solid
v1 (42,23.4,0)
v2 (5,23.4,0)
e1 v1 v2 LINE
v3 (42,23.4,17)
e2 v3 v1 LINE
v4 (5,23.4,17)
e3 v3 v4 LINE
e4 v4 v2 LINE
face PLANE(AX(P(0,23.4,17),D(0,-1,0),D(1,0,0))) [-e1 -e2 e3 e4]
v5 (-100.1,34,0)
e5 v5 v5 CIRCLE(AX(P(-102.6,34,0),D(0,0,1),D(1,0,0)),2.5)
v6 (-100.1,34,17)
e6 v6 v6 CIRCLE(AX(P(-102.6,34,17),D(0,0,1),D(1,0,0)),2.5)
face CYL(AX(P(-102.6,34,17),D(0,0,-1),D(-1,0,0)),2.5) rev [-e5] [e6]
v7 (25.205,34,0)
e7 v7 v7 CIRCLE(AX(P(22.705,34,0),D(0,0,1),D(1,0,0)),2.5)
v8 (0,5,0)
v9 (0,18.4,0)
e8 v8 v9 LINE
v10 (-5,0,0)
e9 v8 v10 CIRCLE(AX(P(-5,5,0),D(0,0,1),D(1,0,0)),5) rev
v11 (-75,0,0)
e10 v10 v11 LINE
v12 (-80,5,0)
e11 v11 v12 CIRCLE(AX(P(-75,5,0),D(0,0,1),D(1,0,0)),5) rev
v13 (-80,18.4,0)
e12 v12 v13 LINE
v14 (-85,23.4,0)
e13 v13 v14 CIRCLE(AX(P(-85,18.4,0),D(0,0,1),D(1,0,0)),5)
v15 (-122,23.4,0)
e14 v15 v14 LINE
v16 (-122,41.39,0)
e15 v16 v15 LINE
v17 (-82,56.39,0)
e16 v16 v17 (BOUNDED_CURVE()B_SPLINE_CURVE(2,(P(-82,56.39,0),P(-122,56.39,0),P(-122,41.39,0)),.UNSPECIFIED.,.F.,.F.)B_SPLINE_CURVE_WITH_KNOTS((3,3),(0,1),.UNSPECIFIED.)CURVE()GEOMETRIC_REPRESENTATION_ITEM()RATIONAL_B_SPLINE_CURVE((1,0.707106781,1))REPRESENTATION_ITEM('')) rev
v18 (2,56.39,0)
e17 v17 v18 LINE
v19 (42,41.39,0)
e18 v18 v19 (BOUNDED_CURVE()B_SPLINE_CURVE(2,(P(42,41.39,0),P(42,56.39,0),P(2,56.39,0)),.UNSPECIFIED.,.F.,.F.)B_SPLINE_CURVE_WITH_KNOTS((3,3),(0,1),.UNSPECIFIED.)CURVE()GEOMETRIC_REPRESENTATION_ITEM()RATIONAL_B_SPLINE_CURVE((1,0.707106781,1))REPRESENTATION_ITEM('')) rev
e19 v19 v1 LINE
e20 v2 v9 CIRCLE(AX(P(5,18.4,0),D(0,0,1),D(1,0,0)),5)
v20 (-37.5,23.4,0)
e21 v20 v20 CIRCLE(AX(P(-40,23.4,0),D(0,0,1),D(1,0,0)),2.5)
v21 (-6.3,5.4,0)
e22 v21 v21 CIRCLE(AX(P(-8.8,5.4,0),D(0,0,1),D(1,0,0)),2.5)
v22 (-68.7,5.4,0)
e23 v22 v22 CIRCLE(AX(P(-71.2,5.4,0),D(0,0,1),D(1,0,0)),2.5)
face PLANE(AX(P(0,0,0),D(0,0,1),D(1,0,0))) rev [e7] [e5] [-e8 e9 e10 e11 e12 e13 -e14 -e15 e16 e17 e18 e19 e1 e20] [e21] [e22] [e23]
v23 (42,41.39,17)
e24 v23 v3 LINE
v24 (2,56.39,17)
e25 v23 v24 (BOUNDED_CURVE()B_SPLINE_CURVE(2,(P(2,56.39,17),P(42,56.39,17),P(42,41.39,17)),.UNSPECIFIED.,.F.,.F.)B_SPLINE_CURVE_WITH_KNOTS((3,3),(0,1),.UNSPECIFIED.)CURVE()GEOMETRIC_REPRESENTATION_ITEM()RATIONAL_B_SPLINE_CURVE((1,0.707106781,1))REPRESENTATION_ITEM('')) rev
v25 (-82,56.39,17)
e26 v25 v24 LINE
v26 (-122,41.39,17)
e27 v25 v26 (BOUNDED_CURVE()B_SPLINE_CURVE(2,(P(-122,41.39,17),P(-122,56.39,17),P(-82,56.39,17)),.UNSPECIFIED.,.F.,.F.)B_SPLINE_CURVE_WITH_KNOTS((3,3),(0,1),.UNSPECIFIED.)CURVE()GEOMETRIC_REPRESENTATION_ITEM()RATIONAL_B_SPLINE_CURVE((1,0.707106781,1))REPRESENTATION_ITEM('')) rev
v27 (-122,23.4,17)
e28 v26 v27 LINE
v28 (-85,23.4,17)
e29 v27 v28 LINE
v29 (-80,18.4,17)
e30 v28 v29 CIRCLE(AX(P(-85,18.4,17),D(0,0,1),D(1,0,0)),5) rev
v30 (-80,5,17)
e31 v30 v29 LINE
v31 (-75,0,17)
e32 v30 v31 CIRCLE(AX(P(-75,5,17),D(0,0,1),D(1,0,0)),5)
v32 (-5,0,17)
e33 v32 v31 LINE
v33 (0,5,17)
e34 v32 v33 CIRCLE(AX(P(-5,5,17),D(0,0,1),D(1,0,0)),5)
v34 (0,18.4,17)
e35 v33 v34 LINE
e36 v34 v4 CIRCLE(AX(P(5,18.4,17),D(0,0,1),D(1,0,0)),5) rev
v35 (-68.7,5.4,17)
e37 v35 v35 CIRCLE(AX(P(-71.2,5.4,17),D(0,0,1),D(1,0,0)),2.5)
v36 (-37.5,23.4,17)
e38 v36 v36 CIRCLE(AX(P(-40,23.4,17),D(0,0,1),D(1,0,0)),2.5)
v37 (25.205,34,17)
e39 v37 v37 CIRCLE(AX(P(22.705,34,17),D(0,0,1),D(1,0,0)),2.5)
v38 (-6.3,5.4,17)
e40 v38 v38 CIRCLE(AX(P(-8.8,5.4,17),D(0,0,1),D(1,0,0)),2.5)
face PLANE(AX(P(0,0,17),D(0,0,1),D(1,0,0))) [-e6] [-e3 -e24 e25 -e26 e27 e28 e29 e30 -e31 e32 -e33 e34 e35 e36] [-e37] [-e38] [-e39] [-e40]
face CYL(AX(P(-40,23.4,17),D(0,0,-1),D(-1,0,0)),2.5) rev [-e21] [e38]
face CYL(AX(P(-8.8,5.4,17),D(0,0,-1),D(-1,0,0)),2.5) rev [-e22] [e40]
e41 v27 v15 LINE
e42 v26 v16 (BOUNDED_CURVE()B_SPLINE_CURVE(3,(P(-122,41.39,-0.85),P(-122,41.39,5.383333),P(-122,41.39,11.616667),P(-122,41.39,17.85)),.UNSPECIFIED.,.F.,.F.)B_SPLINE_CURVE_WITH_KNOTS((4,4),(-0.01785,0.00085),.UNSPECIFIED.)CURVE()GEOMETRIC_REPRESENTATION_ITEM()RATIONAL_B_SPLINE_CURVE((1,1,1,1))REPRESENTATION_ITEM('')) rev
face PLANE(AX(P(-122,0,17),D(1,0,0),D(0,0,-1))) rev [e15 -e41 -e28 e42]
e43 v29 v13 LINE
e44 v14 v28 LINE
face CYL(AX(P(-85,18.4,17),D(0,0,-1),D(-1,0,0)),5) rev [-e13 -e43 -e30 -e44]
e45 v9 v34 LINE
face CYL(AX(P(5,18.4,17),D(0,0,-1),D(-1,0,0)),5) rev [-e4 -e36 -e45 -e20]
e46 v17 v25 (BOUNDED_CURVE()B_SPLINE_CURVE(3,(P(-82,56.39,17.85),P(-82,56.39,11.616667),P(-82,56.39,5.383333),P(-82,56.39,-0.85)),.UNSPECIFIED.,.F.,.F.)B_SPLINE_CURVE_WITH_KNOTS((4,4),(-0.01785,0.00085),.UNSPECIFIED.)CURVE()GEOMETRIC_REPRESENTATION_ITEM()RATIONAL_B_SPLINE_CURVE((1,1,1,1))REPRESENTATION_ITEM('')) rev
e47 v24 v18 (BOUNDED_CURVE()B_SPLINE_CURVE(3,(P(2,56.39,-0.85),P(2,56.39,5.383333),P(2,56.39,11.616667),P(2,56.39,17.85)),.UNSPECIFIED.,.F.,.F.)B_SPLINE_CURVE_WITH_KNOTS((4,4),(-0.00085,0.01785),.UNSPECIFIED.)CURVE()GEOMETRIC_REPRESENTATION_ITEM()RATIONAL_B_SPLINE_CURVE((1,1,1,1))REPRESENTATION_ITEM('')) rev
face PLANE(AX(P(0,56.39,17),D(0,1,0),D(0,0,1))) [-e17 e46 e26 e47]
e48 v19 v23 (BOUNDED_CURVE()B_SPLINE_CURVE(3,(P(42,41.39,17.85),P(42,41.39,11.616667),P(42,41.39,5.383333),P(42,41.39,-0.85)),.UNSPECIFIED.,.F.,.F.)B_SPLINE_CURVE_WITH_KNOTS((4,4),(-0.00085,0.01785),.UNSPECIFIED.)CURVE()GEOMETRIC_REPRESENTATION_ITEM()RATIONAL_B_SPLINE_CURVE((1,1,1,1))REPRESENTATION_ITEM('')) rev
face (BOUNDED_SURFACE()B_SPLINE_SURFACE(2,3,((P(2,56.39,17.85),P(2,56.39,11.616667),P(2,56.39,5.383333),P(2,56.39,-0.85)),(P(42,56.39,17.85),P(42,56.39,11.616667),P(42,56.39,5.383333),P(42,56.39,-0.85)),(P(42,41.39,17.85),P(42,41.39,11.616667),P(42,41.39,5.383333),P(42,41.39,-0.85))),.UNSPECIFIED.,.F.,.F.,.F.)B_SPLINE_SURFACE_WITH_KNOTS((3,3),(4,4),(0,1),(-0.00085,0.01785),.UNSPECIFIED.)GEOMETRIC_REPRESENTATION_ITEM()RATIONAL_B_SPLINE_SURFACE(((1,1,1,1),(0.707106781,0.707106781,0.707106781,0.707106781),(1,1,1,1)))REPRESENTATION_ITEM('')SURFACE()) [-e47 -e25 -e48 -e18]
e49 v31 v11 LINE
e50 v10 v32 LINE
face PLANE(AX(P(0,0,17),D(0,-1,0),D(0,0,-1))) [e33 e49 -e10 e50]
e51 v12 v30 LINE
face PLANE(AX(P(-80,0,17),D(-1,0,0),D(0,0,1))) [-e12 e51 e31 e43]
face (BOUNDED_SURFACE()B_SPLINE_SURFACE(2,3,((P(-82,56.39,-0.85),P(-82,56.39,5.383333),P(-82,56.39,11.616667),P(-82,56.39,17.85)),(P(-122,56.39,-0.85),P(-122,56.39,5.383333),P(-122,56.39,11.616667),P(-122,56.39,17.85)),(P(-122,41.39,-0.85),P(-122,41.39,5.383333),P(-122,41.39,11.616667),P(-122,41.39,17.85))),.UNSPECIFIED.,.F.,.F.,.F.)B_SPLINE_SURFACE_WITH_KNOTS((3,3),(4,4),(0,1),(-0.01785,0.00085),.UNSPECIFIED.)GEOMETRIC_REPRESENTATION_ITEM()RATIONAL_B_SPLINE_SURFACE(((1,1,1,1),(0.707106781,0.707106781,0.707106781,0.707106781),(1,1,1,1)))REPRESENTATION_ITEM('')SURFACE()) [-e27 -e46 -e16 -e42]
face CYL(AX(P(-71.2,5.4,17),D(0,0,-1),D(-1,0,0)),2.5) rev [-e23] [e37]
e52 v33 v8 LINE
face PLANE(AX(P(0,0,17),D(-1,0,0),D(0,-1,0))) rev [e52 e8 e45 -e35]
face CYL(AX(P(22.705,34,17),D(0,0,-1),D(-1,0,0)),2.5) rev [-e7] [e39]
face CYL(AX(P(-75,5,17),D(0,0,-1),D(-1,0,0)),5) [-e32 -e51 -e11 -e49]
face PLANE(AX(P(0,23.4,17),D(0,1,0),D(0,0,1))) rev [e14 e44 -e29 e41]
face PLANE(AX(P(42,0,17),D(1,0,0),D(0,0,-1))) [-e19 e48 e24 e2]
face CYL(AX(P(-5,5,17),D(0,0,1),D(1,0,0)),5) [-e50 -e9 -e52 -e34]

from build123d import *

# Parameters (mm, degrees)
SKETCH_1_R      = 2.5
EXTRUDE_1_DEPTH = 17
FILLET_1_SIZE   = 15
FILLET_1_SIZE_2 = 40
FILLET_2_R      = 5


with BuildPart() as part:
    # 草图1 → 凸台-拉伸1 (new body)
    with BuildSketch(Plane.XY):
        Polygon((-80, 0), (0, 0), (0, 23.4), (42, 23.4), (42, 56.39), (-122, 56.39), (-122, 23.4), (-80, 23.4), align=None)
        with Locations((-40, 23.4)):
            Circle(SKETCH_1_R, mode=Mode.SUBTRACT)
        with Locations((-71.2, 5.4)):
            Circle(SKETCH_1_R, mode=Mode.SUBTRACT)
        with Locations((-8.8, 5.4)):
            Circle(SKETCH_1_R, mode=Mode.SUBTRACT)
        with Locations((-102.6, 34)):
            Circle(SKETCH_1_R, mode=Mode.SUBTRACT)
        with Locations((22.705, 34)):
            Circle(SKETCH_1_R, mode=Mode.SUBTRACT)
    extrude(amount=EXTRUDE_1_DEPTH)

    # 圆角1
    # an asymmetric fillet: 40, 15 mm, written as the material it takes off along each edge
    with BuildSketch(Plane(origin=(42, 56.39, -100), x_dir=(0, -1, 0), z_dir=(0, 0, 1))) as fillet_1_piece_1:
        with BuildLine():
            Bezier((FILLET_1_SIZE, 0), (0, 0), (0, -FILLET_1_SIZE_2), weights=[1, 0.707106781, 1])
            Line((0, -FILLET_1_SIZE_2), (0, 0))
            Line((0, 0), (FILLET_1_SIZE, 0))
        make_face()
    extrude(amount=217, mode=Mode.SUBTRACT)
    with BuildSketch(Plane(origin=(-122, 56.39, -100), x_dir=(1, 0, 0), z_dir=(0, 0, 1))) as fillet_1_piece_2:
        with BuildLine():
            Bezier((FILLET_1_SIZE_2, 0), (0, 0), (0, -FILLET_1_SIZE), weights=[1, 0.707106781, 1])
            Line((0, -FILLET_1_SIZE), (0, 0))
            Line((0, 0), (FILLET_1_SIZE_2, 0))
        make_face()
    extrude(amount=217, mode=Mode.SUBTRACT)

    # 圆角2
    fillet_2_edges = [part.edges().sort_by_distance(p)[0] for p in [
        (0, 0, 8.5),
        (-80, 0, 8.5),
        (-80, 23.4, 8.5),
        (0, 23.4, 8.5),
    ]]
    fillet(fillet_2_edges, radius=FILLET_2_R)


solid = part.part
